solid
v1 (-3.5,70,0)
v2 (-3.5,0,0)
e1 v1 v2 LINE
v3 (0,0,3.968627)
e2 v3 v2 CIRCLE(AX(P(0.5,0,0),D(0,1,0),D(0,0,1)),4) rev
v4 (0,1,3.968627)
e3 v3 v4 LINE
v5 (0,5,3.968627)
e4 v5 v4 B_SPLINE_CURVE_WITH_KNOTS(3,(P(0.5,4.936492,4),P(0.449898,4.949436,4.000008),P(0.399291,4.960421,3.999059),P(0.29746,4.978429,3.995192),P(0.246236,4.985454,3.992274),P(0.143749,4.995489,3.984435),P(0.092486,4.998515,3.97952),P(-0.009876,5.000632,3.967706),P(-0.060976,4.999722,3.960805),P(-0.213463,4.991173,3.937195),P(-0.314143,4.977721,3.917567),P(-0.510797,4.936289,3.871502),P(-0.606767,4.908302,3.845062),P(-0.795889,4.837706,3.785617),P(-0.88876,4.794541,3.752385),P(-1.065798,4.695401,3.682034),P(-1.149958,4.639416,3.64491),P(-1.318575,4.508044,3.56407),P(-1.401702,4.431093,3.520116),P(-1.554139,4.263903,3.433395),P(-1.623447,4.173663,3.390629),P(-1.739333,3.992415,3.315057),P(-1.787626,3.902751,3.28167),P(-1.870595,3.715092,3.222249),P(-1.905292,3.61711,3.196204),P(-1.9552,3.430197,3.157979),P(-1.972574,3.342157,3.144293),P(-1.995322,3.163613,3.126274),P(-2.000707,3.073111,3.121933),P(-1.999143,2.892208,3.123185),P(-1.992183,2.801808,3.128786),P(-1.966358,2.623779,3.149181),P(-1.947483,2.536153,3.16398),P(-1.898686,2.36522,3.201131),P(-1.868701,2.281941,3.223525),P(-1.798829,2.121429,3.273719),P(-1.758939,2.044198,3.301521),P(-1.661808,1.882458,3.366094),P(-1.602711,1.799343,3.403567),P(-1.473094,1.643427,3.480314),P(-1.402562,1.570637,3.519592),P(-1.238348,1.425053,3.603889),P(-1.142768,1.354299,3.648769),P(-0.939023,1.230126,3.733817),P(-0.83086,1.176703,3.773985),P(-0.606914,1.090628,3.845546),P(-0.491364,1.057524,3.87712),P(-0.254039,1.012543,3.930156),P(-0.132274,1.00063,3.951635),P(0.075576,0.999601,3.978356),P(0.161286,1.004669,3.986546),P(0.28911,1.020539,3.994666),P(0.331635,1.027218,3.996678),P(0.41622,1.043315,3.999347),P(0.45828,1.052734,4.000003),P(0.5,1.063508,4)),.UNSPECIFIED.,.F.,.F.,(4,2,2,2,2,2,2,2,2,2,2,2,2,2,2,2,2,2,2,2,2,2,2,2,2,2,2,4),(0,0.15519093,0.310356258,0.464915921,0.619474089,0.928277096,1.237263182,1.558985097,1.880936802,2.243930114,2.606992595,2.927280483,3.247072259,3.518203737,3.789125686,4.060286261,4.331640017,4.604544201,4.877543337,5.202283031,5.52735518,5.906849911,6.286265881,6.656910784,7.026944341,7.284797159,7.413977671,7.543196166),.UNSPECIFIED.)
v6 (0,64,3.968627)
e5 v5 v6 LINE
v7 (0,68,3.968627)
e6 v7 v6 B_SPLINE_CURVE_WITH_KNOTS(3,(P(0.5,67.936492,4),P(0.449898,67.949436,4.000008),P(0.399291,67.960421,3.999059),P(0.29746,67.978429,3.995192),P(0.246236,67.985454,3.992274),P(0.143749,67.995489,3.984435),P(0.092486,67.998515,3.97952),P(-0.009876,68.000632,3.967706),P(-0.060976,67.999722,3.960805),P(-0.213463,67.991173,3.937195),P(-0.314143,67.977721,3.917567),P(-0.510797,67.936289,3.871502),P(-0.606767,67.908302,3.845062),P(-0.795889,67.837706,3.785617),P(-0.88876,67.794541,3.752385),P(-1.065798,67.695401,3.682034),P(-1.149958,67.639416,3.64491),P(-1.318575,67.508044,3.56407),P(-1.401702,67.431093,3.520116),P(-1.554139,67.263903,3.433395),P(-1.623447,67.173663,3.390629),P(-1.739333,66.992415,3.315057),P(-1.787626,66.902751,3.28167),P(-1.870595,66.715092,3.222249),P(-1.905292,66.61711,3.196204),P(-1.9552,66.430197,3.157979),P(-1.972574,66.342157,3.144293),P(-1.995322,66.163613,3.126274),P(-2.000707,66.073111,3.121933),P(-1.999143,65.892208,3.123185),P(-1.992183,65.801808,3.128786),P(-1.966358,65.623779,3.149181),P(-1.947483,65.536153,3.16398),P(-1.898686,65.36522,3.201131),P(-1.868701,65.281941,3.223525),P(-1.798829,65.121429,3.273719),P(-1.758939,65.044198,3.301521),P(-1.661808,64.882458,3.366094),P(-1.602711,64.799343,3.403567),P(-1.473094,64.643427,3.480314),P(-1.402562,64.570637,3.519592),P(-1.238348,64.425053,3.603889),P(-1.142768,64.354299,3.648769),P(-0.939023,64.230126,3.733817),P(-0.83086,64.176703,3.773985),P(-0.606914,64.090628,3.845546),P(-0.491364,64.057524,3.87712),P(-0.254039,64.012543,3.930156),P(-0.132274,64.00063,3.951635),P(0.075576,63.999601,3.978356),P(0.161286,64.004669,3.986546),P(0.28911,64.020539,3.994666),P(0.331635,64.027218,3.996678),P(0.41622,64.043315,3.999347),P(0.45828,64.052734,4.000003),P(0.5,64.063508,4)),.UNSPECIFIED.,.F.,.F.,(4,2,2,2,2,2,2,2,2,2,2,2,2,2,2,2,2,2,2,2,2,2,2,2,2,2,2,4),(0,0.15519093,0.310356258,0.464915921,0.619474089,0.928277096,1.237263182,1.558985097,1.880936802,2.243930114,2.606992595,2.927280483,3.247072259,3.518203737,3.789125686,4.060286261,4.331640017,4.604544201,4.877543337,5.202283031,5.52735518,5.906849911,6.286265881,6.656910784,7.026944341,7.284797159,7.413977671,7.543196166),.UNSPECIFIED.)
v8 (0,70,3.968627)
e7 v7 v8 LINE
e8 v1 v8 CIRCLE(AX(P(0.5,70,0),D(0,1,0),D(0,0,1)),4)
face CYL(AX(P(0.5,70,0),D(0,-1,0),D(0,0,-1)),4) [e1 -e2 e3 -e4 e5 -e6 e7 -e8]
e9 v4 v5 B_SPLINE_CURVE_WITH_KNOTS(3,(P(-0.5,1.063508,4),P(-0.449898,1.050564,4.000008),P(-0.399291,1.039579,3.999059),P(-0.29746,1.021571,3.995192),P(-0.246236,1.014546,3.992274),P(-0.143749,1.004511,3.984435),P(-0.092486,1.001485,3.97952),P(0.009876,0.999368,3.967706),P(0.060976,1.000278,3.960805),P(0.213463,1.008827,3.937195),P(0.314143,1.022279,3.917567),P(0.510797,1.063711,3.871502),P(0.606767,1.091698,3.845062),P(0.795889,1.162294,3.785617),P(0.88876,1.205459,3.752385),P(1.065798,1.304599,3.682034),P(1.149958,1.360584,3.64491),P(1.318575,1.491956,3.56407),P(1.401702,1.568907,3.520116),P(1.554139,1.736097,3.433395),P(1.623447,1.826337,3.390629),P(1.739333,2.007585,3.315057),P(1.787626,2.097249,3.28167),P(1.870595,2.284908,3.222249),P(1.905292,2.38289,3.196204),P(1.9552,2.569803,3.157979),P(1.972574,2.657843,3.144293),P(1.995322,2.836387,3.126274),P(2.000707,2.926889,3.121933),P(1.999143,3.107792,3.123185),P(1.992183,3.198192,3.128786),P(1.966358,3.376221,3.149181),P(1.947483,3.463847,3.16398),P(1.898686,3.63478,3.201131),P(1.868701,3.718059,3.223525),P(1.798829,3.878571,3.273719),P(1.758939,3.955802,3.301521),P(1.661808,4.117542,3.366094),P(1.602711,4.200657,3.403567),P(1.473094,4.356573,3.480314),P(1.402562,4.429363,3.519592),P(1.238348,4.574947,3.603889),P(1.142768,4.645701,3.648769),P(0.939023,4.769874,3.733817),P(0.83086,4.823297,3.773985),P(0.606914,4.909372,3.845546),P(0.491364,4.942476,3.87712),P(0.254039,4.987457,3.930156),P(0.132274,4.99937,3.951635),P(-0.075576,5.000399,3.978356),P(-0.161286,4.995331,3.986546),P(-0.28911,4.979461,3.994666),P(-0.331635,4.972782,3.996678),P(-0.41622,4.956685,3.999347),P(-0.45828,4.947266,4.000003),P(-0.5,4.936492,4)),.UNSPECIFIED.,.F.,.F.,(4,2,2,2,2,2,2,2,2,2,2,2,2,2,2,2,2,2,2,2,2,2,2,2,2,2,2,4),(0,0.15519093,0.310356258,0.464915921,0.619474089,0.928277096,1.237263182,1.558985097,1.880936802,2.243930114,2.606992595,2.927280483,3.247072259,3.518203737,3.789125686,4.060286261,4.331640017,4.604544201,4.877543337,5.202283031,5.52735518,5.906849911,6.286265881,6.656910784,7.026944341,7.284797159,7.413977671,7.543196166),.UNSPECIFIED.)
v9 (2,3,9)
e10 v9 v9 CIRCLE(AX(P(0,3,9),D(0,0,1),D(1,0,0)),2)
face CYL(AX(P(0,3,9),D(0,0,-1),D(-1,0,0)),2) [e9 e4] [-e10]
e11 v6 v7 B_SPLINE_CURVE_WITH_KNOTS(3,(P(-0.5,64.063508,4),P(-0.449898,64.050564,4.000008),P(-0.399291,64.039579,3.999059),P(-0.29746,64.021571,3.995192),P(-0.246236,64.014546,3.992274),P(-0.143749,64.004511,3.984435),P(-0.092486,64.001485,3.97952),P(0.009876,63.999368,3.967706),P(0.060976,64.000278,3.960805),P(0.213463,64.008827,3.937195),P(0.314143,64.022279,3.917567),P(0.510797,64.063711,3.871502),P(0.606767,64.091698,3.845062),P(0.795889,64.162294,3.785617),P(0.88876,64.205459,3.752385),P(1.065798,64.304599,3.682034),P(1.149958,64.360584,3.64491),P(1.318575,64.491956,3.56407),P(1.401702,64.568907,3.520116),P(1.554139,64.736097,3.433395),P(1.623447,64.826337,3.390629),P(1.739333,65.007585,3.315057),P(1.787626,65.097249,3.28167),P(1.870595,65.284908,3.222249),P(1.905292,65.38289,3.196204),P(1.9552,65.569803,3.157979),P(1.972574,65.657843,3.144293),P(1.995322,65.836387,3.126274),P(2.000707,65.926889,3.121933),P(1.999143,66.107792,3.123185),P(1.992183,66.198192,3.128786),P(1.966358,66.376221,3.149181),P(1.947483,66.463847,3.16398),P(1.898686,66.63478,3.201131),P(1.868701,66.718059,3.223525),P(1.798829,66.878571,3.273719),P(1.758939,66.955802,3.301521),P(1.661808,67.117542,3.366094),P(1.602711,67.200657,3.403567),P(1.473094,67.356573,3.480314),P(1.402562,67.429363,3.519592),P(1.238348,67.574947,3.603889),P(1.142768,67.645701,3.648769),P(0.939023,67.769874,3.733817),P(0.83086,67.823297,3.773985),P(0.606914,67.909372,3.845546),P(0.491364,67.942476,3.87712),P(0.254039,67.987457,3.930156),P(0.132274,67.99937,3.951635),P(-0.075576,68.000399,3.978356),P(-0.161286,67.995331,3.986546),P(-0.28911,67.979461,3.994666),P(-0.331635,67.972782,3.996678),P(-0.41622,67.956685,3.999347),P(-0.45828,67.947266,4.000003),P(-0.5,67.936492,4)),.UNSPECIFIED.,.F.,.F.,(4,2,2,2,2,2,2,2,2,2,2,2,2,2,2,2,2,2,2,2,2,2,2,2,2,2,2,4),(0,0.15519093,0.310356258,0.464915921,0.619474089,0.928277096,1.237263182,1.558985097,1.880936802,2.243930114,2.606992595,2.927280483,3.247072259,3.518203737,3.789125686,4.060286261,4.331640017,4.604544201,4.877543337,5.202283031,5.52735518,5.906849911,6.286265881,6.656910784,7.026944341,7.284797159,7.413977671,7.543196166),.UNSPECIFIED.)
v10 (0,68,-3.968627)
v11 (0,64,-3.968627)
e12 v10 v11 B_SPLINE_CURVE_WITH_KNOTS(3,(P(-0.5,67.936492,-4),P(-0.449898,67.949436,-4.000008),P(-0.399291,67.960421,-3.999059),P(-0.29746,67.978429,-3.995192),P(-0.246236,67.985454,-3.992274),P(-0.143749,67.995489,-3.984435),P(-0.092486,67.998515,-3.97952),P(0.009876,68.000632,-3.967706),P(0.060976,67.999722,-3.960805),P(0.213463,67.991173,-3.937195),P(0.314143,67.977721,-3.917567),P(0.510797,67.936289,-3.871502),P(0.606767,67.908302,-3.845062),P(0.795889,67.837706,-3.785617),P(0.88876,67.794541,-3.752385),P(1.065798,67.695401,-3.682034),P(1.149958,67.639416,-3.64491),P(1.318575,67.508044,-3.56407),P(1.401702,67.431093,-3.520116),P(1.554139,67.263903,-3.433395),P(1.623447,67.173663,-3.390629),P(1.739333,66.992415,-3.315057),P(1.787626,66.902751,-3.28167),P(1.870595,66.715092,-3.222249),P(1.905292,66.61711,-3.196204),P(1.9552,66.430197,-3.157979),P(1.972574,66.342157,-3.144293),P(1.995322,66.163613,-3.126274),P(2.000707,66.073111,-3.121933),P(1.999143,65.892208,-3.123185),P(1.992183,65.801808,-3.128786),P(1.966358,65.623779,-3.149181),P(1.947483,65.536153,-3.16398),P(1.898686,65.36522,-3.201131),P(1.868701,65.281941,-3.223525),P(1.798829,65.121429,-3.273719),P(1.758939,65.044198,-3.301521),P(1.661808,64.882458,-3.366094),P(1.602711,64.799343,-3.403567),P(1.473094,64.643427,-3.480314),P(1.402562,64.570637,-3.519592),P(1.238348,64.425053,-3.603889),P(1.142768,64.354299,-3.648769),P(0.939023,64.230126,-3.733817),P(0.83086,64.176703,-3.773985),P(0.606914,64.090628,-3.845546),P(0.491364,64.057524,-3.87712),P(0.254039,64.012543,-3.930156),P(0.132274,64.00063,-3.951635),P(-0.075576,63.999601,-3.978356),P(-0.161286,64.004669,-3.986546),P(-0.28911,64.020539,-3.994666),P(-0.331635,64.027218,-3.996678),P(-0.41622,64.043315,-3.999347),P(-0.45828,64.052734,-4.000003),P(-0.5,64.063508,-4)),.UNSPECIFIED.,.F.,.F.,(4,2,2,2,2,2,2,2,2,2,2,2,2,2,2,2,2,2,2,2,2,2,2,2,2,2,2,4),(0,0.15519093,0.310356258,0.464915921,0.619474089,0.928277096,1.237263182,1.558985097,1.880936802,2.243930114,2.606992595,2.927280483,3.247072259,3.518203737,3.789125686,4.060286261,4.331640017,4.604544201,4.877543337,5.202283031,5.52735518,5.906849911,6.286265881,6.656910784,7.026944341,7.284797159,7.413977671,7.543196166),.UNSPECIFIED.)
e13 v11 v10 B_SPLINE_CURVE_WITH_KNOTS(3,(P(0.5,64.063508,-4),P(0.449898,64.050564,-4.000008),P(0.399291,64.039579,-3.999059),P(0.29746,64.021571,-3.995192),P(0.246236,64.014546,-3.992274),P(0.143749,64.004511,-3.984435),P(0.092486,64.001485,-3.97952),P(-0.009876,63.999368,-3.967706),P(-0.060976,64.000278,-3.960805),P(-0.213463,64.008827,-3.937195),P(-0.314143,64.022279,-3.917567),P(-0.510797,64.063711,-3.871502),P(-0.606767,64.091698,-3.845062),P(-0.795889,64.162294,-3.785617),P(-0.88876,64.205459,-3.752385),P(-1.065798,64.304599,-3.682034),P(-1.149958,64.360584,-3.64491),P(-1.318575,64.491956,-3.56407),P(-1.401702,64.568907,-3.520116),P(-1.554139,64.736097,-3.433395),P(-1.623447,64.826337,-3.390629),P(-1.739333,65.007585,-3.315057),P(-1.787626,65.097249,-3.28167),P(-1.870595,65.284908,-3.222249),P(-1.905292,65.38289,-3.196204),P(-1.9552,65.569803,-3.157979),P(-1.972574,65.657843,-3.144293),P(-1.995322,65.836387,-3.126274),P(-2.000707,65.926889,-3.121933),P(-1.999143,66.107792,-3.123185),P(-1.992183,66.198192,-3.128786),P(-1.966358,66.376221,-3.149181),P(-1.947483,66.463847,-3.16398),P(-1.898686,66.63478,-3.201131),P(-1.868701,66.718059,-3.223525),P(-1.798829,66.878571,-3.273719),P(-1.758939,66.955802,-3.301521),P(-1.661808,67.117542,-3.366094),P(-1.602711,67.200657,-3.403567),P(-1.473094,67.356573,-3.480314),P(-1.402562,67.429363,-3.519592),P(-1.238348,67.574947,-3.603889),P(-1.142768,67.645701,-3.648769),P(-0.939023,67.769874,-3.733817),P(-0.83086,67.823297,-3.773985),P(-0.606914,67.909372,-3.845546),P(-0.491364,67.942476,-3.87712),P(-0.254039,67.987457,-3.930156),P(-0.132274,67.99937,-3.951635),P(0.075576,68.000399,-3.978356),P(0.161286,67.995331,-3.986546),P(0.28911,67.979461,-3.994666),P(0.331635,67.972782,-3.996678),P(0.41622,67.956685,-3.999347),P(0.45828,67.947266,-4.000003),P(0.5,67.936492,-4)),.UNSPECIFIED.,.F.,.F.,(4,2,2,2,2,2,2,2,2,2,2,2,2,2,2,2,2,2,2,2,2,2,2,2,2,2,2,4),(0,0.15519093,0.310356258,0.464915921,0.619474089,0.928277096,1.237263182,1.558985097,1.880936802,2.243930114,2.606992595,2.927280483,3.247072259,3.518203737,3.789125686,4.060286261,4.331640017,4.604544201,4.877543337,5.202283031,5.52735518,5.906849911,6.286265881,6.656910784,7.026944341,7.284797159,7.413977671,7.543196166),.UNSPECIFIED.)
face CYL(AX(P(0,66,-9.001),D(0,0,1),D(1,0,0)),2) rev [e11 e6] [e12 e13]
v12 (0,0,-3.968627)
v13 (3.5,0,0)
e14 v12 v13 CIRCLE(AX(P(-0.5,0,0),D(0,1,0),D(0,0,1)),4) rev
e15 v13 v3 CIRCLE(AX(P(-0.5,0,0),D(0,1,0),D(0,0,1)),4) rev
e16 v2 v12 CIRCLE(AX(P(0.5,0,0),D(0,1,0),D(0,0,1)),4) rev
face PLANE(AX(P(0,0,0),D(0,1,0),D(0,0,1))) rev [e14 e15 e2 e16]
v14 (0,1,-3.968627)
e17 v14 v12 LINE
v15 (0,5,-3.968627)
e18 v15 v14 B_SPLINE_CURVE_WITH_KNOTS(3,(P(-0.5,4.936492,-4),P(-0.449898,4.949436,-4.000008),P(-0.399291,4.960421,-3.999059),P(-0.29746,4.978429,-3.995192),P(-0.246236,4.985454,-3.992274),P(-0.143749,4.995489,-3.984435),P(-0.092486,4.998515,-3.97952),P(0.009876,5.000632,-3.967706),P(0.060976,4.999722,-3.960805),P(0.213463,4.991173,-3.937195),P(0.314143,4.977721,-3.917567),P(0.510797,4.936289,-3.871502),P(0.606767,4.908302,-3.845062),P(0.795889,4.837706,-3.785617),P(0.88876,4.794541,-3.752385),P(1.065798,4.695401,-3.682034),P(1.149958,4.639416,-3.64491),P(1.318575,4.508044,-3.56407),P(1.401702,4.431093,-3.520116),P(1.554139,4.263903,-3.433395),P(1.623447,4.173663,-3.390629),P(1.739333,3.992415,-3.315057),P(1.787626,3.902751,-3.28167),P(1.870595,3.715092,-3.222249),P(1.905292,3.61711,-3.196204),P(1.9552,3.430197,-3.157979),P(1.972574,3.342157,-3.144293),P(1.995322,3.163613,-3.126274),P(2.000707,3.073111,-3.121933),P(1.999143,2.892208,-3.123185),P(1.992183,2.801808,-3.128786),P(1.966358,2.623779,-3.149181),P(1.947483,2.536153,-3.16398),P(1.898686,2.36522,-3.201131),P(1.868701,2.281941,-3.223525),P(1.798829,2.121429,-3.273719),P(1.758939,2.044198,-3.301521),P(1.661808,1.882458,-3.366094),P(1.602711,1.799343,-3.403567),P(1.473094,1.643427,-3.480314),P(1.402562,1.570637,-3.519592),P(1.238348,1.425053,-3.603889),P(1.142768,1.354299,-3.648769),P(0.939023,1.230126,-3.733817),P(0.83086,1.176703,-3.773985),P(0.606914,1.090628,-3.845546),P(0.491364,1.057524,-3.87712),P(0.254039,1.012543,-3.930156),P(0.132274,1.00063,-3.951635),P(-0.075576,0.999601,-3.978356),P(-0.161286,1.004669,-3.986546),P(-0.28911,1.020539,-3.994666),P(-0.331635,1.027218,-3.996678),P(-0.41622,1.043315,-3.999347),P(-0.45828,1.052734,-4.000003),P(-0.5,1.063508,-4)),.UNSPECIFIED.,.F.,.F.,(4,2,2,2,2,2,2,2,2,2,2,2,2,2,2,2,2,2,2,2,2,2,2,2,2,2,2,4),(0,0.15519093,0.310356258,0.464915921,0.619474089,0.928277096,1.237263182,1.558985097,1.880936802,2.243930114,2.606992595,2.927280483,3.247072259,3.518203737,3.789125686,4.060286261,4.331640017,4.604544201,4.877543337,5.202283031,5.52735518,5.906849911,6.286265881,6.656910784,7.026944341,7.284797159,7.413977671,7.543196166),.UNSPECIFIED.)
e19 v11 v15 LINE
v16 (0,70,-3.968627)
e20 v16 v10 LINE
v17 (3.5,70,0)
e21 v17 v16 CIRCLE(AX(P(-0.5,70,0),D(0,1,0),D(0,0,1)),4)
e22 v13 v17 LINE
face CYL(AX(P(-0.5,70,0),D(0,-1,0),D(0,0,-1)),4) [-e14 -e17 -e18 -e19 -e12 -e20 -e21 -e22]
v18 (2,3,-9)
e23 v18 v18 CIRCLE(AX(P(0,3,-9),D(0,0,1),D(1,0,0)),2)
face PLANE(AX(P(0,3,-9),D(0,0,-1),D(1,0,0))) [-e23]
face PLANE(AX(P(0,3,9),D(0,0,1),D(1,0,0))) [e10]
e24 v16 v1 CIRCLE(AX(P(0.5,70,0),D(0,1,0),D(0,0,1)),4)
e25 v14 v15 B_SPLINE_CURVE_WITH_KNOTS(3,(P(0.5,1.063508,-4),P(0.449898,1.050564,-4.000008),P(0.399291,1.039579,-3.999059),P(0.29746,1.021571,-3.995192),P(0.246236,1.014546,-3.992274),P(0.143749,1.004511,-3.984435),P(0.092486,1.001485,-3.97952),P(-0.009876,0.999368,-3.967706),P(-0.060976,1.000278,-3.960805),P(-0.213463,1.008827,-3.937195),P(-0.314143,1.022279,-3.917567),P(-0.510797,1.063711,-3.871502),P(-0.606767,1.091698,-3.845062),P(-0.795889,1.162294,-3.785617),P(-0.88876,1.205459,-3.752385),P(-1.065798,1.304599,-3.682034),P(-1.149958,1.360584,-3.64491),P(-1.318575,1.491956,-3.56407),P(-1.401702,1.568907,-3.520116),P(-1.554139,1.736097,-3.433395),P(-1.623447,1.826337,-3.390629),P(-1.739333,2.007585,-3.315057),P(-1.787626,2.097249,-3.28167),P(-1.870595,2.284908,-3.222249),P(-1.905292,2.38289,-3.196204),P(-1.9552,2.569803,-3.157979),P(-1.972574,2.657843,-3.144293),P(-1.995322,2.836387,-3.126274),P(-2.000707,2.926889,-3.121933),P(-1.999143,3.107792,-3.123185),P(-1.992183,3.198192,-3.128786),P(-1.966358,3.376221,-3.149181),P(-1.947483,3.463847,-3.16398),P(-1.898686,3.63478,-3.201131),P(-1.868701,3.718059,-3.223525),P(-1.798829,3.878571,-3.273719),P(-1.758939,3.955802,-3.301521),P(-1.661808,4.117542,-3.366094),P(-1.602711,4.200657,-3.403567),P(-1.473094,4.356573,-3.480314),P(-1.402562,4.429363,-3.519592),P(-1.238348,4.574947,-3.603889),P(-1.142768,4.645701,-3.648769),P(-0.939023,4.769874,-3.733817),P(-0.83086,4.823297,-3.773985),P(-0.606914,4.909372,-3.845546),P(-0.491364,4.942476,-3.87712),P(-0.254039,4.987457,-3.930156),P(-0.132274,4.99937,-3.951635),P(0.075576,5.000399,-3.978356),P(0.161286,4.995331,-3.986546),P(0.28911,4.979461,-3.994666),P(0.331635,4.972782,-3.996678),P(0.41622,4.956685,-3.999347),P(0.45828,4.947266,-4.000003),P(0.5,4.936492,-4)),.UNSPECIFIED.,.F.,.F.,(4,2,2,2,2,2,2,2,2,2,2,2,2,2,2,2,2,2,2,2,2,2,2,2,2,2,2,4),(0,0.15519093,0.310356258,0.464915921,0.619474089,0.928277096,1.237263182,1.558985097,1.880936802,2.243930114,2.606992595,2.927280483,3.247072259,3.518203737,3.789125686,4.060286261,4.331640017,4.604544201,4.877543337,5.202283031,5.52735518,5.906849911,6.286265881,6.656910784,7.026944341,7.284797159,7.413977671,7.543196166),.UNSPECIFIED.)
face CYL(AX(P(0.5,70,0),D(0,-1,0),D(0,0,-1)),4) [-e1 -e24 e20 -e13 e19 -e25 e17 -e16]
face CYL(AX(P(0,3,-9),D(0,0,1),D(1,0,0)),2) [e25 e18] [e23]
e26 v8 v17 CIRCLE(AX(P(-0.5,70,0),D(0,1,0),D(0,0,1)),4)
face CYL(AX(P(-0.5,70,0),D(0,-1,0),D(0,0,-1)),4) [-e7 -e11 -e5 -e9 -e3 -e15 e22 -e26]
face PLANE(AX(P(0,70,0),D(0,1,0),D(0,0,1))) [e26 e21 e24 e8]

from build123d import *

# Parameters (mm, degrees)
SKETCH2_W           = 7
SKETCH2_H           = 8
BOSS_EXTRUDE1_DEPTH = 70
SKETCH3_R           = 2
BOSS_EXTRUDE2_DEPTH = 5
CUT_EXTRUDE1_REACH  = 73.283
SKETCH4_R           = 2
FILLET1_R           = 4


with BuildPart() as part:
    # Sketch2 → Boss-Extrude1 (new body)
    with BuildSketch(Plane(origin=(0, 0, 0), x_dir=(1, 0, 0), z_dir=(0, 1, 0))):
        Rectangle(SKETCH2_W, SKETCH2_H)
    extrude(amount=BOSS_EXTRUDE1_DEPTH)

    # Sketch3 → Boss-Extrude2 (add)
    with BuildSketch(Plane.XY.offset(4)):
        with Locations(Location((0, 3, 0), (0, 0, 180))):
            Circle(SKETCH3_R)
    boss_extrude2 = extrude(amount=BOSS_EXTRUDE2_DEPTH)

    # Mirror1: Boss-Extrude2 across plane
    add(boss_extrude2.mirror(Plane.XY))

    # Sketch4 → Cut-Extrude1 (cut, up to next)
    with BuildSketch(Plane.XY.offset(4), mode=Mode.PRIVATE) as cut_extrude1_sk1:
        with Locations((0, 66)):
            Circle(SKETCH4_R)
    cut_extrude1_tool1 = extrude(cut_extrude1_sk1.sketch, amount=-CUT_EXTRUDE1_REACH, mode=Mode.PRIVATE) & part.part
    add(cut_extrude1_tool1.solids().sort_by_distance((0, 66, 4))[0], mode=Mode.SUBTRACT)

    # Fillet1
    # the kernel refuses this fillet: 4 mm, written as the material it takes off along each edge
    with BuildSketch(Plane(origin=(-3.5, -10, 4), x_dir=(0, 0, -1), z_dir=(0, 1, 0))) as fillet1_piece_1_section:
        with BuildLine():
            CenterArc((FILLET1_R, -FILLET1_R), FILLET1_R, 90, 90)
            Line((0, -FILLET1_R), (0, 0))
            Line((0, 0), (FILLET1_R, 0))
        make_face()
    fillet1_piece_1 = extrude(amount=90, mode=Mode.PRIVATE)
    fillet1_piece_1 = fillet1_piece_1 - Plane(origin=(0, 3, 3.08936477), x_dir=(-1, 0, 0), z_dir=(0, 0, -1)) * Cylinder(2, 196, mode=Mode.PRIVATE)
    add(fillet1_piece_1, mode=Mode.SUBTRACT)
    with BuildSketch(Plane(origin=(-3.5, -10, -4), x_dir=(1, 0, 0), z_dir=(0, 1, 0))) as fillet1_piece_2_section:
        with BuildLine():
            CenterArc((FILLET1_R, -FILLET1_R), FILLET1_R, 90, 90)
            Line((0, -FILLET1_R), (0, 0))
            Line((0, 0), (FILLET1_R, 0))
        make_face()
    fillet1_piece_2 = extrude(amount=90, mode=Mode.PRIVATE)
    fillet1_piece_2 = fillet1_piece_2 - Plane(origin=(0, 3, -3.089364757), x_dir=(-1, 0, 0), z_dir=(0, 0, 1)) * Cylinder(2, 196, mode=Mode.PRIVATE)
    add(fillet1_piece_2, mode=Mode.SUBTRACT)
    with BuildSketch(Plane(origin=(3.5, -10, -4), x_dir=(-1, 0, 0), z_dir=(0, 1, 0))) as fillet1_piece_3_section:
        with BuildLine():
            CenterArc((FILLET1_R, FILLET1_R), FILLET1_R, 180, 90)
            Line((0, FILLET1_R), (0, 0))
            Line((0, 0), (FILLET1_R, 0))
        make_face()
    fillet1_piece_3 = extrude(amount=90, mode=Mode.PRIVATE)
    fillet1_piece_3 = fillet1_piece_3 - Plane(origin=(0, 3, -3.089364802), x_dir=(-1, 0, 0), z_dir=(0, 0, 1)) * Cylinder(2, 196, mode=Mode.PRIVATE)
    add(fillet1_piece_3, mode=Mode.SUBTRACT)
    with BuildSketch(Plane(origin=(3.5, -10, 4), x_dir=(0, 0, -1), z_dir=(0, 1, 0))) as fillet1_piece_4_section:
        with BuildLine():
            CenterArc((FILLET1_R, FILLET1_R), FILLET1_R, 180, 90)
            Line((0, FILLET1_R), (0, 0))
            Line((0, 0), (FILLET1_R, 0))
        make_face()
    fillet1_piece_4 = extrude(amount=90, mode=Mode.PRIVATE)
    fillet1_piece_4 = fillet1_piece_4 - Plane(origin=(0, 3, 3.089364961), x_dir=(-1, 0, 0), z_dir=(0, 0, -1)) * Cylinder(2, 196, mode=Mode.PRIVATE)
    add(fillet1_piece_4, mode=Mode.SUBTRACT)


solid = part.part
